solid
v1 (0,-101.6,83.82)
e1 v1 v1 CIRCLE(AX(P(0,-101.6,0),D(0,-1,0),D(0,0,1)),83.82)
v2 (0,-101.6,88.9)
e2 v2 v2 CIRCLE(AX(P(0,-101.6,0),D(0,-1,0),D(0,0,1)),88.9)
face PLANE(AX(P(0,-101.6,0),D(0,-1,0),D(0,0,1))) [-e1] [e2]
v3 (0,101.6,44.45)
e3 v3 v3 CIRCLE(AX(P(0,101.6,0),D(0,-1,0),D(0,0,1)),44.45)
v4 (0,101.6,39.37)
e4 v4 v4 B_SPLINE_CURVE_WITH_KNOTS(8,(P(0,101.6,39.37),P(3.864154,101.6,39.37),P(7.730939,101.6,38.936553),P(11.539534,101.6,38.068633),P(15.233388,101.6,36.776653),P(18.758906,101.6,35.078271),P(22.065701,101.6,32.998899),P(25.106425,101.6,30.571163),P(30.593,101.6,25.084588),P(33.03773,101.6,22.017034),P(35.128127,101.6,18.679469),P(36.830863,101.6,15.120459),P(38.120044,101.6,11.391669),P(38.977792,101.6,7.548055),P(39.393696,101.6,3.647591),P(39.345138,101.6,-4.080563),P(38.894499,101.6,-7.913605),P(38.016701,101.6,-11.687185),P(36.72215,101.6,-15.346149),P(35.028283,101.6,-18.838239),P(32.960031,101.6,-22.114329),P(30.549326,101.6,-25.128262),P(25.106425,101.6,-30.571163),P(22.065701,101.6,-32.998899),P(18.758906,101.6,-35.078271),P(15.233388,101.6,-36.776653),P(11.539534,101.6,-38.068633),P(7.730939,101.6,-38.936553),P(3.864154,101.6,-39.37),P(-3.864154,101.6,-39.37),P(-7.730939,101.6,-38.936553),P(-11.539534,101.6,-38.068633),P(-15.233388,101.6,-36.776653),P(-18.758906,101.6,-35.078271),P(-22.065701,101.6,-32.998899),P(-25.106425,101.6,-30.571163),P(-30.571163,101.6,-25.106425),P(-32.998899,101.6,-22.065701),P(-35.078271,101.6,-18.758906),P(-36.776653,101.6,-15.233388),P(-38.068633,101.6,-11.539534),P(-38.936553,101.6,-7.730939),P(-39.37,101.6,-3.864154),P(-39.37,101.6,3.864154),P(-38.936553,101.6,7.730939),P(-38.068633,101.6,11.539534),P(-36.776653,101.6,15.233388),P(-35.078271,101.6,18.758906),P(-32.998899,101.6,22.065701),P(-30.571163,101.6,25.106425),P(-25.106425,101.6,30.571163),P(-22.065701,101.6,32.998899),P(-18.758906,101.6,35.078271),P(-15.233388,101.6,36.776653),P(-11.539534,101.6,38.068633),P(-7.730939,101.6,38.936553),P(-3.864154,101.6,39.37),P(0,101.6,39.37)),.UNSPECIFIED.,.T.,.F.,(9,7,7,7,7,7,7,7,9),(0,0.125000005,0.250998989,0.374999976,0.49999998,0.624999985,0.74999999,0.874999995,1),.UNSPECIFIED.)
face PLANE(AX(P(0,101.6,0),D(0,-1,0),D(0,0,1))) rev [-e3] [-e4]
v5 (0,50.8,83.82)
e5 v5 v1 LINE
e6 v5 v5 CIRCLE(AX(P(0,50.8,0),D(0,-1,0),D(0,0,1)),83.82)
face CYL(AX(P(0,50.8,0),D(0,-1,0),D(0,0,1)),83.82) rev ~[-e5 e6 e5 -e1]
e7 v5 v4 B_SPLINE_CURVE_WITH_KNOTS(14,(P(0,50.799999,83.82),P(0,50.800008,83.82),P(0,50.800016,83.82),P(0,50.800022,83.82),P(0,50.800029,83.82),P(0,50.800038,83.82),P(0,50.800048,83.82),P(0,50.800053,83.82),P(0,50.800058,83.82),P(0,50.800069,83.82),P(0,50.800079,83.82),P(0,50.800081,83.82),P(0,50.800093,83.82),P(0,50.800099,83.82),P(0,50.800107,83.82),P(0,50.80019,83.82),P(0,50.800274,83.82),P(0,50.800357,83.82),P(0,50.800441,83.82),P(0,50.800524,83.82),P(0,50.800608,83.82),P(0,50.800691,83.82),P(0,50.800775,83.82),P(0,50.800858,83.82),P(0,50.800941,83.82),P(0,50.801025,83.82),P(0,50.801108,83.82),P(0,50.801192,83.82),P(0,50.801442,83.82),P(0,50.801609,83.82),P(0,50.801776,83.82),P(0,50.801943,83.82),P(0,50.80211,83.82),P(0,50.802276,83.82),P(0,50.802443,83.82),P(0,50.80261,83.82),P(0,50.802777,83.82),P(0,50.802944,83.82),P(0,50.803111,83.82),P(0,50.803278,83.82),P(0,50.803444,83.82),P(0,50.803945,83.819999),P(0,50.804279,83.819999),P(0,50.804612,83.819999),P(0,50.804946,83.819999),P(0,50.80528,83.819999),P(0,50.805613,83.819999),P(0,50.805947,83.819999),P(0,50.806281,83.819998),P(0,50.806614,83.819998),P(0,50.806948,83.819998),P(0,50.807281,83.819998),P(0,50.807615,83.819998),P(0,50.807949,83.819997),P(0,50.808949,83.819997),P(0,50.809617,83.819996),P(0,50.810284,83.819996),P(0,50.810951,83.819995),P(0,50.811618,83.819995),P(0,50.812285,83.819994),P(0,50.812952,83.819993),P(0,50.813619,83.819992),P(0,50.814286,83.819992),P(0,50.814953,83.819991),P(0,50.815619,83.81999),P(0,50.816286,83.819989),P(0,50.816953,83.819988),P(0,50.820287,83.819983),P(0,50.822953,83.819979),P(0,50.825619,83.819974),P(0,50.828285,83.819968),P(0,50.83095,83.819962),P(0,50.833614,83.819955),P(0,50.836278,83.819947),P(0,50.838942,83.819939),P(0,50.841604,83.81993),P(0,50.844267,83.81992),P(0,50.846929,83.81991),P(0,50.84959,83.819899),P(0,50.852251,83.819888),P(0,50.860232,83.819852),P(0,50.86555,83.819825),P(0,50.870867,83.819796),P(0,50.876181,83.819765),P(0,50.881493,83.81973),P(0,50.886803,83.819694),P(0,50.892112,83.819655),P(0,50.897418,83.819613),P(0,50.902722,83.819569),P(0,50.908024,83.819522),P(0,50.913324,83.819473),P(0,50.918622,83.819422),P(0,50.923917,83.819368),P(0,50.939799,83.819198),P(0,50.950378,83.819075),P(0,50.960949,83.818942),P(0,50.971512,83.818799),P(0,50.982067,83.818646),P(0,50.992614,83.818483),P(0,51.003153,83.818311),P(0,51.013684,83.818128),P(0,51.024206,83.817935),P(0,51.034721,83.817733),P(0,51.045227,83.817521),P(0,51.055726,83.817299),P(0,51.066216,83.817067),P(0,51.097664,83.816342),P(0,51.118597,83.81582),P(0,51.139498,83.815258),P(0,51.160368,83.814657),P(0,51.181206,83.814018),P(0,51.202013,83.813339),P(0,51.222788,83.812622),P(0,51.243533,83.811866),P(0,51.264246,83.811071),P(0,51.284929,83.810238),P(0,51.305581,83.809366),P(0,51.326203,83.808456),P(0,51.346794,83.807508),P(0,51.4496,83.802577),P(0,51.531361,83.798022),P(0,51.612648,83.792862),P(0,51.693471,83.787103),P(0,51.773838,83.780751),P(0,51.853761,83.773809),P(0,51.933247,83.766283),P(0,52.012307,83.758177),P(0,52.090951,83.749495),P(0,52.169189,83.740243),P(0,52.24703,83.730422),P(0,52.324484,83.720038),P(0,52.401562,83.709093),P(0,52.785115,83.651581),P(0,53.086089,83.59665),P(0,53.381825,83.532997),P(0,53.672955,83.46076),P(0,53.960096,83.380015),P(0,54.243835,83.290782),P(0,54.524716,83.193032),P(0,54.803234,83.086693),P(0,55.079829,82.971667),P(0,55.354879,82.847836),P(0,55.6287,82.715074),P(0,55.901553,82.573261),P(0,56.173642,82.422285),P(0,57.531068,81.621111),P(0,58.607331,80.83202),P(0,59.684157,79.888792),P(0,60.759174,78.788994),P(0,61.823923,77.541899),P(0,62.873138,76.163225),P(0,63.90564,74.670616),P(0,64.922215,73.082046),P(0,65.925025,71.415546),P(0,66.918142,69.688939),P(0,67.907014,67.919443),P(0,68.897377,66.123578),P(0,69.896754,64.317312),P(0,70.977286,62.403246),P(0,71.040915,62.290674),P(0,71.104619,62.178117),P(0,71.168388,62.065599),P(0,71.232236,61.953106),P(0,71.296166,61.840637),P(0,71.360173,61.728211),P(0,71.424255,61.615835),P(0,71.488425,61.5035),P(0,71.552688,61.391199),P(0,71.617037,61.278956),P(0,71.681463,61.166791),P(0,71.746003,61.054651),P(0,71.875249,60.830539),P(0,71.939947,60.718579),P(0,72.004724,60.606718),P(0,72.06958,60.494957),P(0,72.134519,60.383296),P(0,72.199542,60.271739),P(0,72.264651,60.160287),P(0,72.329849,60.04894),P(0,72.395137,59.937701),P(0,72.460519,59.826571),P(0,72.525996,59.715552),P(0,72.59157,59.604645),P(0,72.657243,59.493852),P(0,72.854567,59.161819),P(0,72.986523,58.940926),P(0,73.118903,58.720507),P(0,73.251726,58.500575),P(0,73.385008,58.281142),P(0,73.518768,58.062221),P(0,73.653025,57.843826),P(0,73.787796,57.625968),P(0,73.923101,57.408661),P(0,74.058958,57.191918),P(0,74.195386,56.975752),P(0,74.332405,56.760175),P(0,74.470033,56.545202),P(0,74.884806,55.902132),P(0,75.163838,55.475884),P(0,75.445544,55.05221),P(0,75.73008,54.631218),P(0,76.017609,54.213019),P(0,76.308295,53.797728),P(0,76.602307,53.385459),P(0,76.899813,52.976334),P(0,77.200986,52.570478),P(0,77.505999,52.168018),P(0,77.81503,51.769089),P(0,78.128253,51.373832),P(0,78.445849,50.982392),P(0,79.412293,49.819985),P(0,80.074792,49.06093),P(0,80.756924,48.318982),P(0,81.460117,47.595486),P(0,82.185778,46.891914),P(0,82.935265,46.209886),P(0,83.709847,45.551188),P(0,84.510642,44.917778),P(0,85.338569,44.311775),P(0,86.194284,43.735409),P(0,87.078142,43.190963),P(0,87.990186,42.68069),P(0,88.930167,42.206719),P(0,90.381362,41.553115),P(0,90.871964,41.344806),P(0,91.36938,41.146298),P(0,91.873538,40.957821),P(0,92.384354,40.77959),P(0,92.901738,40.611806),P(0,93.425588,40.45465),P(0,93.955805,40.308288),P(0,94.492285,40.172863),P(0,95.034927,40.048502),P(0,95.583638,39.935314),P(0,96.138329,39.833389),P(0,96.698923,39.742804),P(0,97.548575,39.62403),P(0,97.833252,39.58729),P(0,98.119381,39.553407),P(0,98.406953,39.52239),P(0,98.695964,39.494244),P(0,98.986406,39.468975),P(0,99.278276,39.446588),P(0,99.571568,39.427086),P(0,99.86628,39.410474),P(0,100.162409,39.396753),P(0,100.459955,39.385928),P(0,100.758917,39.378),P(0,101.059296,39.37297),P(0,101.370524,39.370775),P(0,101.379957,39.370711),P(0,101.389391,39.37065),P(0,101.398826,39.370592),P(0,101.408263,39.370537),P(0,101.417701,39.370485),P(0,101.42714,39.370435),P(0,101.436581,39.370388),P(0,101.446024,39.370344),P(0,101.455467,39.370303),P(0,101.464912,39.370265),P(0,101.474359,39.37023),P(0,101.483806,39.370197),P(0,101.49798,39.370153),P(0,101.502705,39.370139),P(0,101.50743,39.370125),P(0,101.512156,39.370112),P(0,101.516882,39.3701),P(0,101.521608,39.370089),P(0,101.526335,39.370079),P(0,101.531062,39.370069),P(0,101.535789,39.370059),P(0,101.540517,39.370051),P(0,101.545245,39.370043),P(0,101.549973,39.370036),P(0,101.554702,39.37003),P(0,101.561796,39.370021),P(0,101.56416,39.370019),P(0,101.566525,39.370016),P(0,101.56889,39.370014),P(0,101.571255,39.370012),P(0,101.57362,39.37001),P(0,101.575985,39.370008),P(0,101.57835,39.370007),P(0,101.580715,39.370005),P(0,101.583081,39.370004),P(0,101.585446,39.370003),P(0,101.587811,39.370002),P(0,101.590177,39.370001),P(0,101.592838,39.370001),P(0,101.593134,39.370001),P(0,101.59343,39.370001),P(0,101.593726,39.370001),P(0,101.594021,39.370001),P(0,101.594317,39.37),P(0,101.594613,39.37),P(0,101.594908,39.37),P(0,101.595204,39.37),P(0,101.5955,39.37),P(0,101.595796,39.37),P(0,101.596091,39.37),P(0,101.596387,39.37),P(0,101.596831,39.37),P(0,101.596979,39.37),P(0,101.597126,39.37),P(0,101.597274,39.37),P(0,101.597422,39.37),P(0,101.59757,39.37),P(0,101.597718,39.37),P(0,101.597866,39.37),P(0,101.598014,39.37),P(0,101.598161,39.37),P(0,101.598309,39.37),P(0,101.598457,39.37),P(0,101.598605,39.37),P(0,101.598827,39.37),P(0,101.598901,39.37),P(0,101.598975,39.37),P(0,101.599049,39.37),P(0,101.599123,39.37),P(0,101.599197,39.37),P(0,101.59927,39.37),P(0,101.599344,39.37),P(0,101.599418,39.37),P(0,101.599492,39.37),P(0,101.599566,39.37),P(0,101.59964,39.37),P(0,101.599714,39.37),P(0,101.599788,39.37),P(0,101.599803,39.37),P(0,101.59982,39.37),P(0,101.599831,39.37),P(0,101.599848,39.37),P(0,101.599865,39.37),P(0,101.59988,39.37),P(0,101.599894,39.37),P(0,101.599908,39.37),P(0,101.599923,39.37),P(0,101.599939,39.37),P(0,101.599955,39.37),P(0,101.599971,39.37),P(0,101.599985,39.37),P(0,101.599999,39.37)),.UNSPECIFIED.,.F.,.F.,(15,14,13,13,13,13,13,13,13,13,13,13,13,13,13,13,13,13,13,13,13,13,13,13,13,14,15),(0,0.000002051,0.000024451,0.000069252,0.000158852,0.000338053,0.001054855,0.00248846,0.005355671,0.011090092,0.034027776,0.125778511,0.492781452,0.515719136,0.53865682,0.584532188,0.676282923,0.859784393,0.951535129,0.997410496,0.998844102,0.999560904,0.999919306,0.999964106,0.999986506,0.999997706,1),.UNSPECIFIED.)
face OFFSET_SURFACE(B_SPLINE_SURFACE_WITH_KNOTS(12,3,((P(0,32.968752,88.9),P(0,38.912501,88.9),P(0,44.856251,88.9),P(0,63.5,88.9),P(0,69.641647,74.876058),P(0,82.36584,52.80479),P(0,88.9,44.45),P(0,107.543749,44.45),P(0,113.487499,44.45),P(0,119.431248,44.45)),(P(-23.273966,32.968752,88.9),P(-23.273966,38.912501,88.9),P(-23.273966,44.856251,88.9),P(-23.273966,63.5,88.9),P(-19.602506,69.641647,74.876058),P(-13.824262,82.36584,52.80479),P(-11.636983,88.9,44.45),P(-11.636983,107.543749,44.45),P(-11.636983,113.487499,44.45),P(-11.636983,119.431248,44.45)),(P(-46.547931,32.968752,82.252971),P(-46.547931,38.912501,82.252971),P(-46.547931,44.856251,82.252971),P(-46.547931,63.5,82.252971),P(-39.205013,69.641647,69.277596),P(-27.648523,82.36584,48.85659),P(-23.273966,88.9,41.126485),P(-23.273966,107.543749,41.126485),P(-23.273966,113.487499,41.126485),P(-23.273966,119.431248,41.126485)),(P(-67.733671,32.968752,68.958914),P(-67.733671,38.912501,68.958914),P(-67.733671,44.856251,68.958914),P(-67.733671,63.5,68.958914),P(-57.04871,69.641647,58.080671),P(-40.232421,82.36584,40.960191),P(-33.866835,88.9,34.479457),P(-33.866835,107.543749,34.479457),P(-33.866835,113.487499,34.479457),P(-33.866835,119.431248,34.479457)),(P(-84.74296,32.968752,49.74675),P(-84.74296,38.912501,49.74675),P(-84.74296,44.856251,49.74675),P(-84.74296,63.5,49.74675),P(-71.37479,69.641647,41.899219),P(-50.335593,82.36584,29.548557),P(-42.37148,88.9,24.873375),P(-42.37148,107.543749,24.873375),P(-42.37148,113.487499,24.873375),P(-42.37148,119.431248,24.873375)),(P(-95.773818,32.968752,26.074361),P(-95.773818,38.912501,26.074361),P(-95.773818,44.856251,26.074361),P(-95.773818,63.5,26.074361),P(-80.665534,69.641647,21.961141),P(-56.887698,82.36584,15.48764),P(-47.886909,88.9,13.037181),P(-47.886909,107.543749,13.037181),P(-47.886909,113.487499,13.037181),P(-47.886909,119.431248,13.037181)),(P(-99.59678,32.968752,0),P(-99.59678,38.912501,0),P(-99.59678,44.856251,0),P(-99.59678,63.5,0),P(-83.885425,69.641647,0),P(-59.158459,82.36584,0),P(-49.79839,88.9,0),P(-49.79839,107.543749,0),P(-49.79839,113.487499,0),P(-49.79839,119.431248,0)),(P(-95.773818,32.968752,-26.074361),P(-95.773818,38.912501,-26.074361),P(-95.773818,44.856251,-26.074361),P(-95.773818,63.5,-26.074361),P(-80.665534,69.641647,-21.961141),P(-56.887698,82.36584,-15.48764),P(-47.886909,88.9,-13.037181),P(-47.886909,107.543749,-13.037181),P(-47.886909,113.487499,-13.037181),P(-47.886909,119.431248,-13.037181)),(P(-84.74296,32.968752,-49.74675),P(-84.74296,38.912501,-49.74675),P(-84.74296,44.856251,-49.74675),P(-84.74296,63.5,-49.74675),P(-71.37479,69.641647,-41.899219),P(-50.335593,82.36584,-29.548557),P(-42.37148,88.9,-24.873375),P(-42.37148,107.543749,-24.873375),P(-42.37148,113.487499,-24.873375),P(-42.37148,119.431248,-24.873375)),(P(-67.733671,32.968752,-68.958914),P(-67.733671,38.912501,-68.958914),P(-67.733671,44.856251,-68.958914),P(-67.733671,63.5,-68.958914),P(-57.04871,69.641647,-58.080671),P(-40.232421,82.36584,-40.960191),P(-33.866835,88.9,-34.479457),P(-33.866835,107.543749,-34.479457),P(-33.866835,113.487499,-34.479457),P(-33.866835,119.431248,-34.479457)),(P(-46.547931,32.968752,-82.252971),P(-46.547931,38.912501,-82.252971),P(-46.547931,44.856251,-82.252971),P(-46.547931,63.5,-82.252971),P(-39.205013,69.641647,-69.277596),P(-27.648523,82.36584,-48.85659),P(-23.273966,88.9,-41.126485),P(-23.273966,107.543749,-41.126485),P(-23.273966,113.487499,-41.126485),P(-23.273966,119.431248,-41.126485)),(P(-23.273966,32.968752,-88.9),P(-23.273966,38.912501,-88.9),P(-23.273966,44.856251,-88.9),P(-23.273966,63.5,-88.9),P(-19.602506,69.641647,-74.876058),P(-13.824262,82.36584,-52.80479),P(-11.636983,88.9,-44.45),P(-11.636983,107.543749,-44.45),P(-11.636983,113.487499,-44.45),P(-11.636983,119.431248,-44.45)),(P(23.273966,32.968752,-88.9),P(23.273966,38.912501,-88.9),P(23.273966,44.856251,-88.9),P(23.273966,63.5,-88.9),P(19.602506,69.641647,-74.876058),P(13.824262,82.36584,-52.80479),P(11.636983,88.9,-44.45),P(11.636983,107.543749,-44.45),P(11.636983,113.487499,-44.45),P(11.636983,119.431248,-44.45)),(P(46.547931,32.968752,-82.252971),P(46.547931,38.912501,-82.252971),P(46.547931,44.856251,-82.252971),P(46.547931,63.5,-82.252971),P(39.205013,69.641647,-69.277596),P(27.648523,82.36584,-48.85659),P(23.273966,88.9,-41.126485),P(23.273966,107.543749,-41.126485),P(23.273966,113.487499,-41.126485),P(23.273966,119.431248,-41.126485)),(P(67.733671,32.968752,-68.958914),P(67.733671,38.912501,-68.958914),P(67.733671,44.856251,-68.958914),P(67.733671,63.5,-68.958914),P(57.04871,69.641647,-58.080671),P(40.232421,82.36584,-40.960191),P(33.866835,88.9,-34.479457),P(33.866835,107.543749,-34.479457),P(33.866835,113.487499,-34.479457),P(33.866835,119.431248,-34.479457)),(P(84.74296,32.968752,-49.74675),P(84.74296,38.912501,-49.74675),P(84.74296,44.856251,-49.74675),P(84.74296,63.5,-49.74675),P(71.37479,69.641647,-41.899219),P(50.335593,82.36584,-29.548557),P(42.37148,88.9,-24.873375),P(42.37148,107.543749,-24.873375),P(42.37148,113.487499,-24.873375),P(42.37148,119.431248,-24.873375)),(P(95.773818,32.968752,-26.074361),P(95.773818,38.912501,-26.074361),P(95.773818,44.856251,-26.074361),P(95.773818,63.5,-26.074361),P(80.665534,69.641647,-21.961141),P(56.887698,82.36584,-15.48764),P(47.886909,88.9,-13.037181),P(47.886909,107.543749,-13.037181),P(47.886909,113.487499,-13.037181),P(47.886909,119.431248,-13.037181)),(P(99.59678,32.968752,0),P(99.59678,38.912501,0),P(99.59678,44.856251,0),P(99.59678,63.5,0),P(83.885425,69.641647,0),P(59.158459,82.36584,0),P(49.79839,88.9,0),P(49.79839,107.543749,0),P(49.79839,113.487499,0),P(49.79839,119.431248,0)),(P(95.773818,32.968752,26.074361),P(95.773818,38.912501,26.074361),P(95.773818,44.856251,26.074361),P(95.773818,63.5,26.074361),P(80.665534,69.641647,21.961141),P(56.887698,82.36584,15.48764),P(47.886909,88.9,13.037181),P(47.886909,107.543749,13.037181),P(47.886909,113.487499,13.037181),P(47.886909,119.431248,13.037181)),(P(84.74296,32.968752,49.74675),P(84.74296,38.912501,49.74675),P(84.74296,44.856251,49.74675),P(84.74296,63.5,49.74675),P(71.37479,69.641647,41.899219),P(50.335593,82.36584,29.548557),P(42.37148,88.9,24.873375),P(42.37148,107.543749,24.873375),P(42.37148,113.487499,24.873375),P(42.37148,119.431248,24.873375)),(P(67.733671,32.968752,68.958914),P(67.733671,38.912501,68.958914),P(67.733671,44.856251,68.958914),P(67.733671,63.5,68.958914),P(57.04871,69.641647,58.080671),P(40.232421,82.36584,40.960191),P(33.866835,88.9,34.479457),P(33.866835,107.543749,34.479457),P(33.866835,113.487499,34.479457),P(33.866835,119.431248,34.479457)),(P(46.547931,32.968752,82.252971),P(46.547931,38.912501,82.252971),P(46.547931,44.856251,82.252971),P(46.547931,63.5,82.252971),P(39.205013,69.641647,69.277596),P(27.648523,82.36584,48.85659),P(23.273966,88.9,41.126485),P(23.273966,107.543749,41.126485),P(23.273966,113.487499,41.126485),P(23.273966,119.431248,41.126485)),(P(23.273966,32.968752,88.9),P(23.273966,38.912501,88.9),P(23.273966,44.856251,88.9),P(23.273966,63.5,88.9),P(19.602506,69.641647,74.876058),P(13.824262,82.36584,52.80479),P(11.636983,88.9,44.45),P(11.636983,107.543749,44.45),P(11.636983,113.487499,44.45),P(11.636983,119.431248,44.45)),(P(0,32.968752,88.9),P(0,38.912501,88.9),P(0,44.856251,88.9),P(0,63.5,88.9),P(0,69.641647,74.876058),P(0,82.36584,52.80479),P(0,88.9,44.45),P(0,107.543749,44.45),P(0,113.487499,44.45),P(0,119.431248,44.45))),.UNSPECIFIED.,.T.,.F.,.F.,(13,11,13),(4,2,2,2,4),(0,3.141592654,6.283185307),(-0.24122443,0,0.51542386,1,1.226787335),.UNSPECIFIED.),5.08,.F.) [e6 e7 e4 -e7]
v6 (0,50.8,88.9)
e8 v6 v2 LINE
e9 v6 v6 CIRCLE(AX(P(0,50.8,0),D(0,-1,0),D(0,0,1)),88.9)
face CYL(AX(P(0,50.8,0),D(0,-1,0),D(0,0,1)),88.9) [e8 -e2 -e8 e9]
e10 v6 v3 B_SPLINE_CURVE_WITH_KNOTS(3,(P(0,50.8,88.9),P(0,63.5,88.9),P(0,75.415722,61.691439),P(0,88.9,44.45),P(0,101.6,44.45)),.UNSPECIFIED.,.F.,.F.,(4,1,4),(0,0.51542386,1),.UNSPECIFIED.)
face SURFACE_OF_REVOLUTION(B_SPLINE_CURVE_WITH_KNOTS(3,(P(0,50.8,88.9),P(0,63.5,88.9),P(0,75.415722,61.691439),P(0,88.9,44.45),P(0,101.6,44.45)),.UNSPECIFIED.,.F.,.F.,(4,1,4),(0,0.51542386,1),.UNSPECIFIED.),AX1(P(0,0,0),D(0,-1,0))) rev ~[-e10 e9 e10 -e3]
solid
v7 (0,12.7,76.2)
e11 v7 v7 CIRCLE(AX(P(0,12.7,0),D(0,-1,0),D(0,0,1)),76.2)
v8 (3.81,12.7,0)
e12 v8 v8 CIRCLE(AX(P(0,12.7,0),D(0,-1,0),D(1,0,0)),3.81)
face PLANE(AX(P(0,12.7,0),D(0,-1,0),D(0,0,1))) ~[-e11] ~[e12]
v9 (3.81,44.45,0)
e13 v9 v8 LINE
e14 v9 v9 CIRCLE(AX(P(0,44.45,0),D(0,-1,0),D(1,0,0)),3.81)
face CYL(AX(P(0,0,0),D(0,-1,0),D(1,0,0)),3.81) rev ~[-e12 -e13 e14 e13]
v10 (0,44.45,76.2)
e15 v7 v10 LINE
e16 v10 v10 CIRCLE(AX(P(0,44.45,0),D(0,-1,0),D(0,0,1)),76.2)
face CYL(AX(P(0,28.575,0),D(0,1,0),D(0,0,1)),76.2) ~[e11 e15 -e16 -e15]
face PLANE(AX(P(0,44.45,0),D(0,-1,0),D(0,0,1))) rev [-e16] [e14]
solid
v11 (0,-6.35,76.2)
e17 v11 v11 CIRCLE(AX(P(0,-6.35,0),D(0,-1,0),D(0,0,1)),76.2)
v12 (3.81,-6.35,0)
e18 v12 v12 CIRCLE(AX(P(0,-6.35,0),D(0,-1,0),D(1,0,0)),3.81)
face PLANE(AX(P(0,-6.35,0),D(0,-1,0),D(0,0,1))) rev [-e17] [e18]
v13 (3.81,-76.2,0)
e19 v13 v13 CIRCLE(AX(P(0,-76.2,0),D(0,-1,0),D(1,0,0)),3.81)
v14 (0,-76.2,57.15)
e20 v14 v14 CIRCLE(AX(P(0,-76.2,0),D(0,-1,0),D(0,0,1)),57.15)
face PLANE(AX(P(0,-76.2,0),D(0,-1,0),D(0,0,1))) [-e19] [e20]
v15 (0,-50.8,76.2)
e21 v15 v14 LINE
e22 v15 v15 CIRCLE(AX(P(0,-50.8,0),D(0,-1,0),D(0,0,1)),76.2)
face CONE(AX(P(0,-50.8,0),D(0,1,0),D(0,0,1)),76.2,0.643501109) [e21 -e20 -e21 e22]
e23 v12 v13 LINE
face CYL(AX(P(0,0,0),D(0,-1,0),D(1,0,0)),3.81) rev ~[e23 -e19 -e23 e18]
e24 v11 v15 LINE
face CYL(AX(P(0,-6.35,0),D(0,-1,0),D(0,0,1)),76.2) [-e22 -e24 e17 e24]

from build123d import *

# Parameters (mm, degrees)
F0_W     = 31.75
F0_H     = 76.2
F5_T     = -5.08
F3_R     = 3.81
F3_R_2   = 3.175
F7_DEPTH = 1270


# Not quite as in the source:
# - a feature of the source that left no trace in its solid (it failed there, or was rolled back) is left out


with BuildPart() as f1:
    # F0 (on Right) → F1 (revolve)
    with BuildSketch(Plane.YZ):
        with Locations((28.575, 38.1)):
            Rectangle(F0_W, F0_H)
    revolve(axis=Axis((0, 0, 0), (0, -1, 0)))


with BuildPart() as f1b:
    # F0 (on Right) → F1, piece 2 (revolve)
    with BuildSketch(Plane.YZ):
        Polygon((-76.2, 0), (-6.35, 0), (-6.35, 76.2), (-50.8, 76.2), (-76.2, 57.15), align=None)
    revolve(axis=Axis((0, 0, 0), (0, -1, 0)))


with BuildPart() as f4:
    # F0 (on Right) → F4 (revolve)
    with BuildSketch(Plane.YZ):
        with BuildLine():
            Line((44.45, 0), (101.6, 0))
            Line((101.6, 0), (101.6, 44.45))
            add(Edge.make_bspline(
                [(50.8, 88.9), (63.5, 88.9), (75.4157216212, 61.6914388631), (88.9, 44.45), (101.6, 44.45)],
                knots=[0, 0, 0, 0, 0.5154238597, 1, 1, 1, 1], degree=3))
            Line((50.8, 88.9), (-101.6, 88.9))
            Line((-101.6, 88.9), (-101.6, 0))
            Line((-101.6, 0), (-76.2, 0))
            Line((-76.2, 0), (-76.2, 57.15))
            Line((-76.2, 57.15), (-50.8, 76.2))
            Line((-50.8, 76.2), (-6.35, 76.2))
            Line((-6.35, 76.2), (-6.35, 0))
            Line((-6.35, 0), (12.7, 0))
            Line((12.7, 0), (12.7, 76.2))
            Line((12.7, 76.2), (44.45, 76.2))
            Line((44.45, 76.2), (44.45, 0))
        make_face()
        Polygon((-76.2, 0), (-6.35, 0), (-6.35, 76.2), (-50.8, 76.2), (-76.2, 57.15), align=None)
        with Locations((28.575, 38.1)):
            Rectangle(F0_W, F0_H)
    revolve(axis=Axis((0, 0, 0), (0, -1, 0)))

    # F5
    f5_openings = [f4.faces().sort_by_distance(p)[0] for p in [
        (0, -101.6, 0),
        (0, 101.6, 0),
    ]]
    offset(amount=F5_T, openings=f5_openings)


with BuildPart() as f7_tool:
    # F3 (on Front) → F7 (new body, symmetric)
    with BuildSketch(Plane.XZ):
        Circle(F3_R)
        Circle(F3_R_2, mode=Mode.SUBTRACT)
        Circle(F3_R_2)
    extrude(amount=F7_DEPTH, both=True)


with BuildPart() as f1_1:
    add(f1.part)

    # F7: cut by f7_tool
    add(f7_tool.part, mode=Mode.SUBTRACT)


with BuildPart() as f1b_1:
    add(f1b.part)

    # F7: cut by f7_tool
    add(f7_tool.part, mode=Mode.SUBTRACT)


solid = Compound([f4.part, f1_1.part, f1b_1.part])
